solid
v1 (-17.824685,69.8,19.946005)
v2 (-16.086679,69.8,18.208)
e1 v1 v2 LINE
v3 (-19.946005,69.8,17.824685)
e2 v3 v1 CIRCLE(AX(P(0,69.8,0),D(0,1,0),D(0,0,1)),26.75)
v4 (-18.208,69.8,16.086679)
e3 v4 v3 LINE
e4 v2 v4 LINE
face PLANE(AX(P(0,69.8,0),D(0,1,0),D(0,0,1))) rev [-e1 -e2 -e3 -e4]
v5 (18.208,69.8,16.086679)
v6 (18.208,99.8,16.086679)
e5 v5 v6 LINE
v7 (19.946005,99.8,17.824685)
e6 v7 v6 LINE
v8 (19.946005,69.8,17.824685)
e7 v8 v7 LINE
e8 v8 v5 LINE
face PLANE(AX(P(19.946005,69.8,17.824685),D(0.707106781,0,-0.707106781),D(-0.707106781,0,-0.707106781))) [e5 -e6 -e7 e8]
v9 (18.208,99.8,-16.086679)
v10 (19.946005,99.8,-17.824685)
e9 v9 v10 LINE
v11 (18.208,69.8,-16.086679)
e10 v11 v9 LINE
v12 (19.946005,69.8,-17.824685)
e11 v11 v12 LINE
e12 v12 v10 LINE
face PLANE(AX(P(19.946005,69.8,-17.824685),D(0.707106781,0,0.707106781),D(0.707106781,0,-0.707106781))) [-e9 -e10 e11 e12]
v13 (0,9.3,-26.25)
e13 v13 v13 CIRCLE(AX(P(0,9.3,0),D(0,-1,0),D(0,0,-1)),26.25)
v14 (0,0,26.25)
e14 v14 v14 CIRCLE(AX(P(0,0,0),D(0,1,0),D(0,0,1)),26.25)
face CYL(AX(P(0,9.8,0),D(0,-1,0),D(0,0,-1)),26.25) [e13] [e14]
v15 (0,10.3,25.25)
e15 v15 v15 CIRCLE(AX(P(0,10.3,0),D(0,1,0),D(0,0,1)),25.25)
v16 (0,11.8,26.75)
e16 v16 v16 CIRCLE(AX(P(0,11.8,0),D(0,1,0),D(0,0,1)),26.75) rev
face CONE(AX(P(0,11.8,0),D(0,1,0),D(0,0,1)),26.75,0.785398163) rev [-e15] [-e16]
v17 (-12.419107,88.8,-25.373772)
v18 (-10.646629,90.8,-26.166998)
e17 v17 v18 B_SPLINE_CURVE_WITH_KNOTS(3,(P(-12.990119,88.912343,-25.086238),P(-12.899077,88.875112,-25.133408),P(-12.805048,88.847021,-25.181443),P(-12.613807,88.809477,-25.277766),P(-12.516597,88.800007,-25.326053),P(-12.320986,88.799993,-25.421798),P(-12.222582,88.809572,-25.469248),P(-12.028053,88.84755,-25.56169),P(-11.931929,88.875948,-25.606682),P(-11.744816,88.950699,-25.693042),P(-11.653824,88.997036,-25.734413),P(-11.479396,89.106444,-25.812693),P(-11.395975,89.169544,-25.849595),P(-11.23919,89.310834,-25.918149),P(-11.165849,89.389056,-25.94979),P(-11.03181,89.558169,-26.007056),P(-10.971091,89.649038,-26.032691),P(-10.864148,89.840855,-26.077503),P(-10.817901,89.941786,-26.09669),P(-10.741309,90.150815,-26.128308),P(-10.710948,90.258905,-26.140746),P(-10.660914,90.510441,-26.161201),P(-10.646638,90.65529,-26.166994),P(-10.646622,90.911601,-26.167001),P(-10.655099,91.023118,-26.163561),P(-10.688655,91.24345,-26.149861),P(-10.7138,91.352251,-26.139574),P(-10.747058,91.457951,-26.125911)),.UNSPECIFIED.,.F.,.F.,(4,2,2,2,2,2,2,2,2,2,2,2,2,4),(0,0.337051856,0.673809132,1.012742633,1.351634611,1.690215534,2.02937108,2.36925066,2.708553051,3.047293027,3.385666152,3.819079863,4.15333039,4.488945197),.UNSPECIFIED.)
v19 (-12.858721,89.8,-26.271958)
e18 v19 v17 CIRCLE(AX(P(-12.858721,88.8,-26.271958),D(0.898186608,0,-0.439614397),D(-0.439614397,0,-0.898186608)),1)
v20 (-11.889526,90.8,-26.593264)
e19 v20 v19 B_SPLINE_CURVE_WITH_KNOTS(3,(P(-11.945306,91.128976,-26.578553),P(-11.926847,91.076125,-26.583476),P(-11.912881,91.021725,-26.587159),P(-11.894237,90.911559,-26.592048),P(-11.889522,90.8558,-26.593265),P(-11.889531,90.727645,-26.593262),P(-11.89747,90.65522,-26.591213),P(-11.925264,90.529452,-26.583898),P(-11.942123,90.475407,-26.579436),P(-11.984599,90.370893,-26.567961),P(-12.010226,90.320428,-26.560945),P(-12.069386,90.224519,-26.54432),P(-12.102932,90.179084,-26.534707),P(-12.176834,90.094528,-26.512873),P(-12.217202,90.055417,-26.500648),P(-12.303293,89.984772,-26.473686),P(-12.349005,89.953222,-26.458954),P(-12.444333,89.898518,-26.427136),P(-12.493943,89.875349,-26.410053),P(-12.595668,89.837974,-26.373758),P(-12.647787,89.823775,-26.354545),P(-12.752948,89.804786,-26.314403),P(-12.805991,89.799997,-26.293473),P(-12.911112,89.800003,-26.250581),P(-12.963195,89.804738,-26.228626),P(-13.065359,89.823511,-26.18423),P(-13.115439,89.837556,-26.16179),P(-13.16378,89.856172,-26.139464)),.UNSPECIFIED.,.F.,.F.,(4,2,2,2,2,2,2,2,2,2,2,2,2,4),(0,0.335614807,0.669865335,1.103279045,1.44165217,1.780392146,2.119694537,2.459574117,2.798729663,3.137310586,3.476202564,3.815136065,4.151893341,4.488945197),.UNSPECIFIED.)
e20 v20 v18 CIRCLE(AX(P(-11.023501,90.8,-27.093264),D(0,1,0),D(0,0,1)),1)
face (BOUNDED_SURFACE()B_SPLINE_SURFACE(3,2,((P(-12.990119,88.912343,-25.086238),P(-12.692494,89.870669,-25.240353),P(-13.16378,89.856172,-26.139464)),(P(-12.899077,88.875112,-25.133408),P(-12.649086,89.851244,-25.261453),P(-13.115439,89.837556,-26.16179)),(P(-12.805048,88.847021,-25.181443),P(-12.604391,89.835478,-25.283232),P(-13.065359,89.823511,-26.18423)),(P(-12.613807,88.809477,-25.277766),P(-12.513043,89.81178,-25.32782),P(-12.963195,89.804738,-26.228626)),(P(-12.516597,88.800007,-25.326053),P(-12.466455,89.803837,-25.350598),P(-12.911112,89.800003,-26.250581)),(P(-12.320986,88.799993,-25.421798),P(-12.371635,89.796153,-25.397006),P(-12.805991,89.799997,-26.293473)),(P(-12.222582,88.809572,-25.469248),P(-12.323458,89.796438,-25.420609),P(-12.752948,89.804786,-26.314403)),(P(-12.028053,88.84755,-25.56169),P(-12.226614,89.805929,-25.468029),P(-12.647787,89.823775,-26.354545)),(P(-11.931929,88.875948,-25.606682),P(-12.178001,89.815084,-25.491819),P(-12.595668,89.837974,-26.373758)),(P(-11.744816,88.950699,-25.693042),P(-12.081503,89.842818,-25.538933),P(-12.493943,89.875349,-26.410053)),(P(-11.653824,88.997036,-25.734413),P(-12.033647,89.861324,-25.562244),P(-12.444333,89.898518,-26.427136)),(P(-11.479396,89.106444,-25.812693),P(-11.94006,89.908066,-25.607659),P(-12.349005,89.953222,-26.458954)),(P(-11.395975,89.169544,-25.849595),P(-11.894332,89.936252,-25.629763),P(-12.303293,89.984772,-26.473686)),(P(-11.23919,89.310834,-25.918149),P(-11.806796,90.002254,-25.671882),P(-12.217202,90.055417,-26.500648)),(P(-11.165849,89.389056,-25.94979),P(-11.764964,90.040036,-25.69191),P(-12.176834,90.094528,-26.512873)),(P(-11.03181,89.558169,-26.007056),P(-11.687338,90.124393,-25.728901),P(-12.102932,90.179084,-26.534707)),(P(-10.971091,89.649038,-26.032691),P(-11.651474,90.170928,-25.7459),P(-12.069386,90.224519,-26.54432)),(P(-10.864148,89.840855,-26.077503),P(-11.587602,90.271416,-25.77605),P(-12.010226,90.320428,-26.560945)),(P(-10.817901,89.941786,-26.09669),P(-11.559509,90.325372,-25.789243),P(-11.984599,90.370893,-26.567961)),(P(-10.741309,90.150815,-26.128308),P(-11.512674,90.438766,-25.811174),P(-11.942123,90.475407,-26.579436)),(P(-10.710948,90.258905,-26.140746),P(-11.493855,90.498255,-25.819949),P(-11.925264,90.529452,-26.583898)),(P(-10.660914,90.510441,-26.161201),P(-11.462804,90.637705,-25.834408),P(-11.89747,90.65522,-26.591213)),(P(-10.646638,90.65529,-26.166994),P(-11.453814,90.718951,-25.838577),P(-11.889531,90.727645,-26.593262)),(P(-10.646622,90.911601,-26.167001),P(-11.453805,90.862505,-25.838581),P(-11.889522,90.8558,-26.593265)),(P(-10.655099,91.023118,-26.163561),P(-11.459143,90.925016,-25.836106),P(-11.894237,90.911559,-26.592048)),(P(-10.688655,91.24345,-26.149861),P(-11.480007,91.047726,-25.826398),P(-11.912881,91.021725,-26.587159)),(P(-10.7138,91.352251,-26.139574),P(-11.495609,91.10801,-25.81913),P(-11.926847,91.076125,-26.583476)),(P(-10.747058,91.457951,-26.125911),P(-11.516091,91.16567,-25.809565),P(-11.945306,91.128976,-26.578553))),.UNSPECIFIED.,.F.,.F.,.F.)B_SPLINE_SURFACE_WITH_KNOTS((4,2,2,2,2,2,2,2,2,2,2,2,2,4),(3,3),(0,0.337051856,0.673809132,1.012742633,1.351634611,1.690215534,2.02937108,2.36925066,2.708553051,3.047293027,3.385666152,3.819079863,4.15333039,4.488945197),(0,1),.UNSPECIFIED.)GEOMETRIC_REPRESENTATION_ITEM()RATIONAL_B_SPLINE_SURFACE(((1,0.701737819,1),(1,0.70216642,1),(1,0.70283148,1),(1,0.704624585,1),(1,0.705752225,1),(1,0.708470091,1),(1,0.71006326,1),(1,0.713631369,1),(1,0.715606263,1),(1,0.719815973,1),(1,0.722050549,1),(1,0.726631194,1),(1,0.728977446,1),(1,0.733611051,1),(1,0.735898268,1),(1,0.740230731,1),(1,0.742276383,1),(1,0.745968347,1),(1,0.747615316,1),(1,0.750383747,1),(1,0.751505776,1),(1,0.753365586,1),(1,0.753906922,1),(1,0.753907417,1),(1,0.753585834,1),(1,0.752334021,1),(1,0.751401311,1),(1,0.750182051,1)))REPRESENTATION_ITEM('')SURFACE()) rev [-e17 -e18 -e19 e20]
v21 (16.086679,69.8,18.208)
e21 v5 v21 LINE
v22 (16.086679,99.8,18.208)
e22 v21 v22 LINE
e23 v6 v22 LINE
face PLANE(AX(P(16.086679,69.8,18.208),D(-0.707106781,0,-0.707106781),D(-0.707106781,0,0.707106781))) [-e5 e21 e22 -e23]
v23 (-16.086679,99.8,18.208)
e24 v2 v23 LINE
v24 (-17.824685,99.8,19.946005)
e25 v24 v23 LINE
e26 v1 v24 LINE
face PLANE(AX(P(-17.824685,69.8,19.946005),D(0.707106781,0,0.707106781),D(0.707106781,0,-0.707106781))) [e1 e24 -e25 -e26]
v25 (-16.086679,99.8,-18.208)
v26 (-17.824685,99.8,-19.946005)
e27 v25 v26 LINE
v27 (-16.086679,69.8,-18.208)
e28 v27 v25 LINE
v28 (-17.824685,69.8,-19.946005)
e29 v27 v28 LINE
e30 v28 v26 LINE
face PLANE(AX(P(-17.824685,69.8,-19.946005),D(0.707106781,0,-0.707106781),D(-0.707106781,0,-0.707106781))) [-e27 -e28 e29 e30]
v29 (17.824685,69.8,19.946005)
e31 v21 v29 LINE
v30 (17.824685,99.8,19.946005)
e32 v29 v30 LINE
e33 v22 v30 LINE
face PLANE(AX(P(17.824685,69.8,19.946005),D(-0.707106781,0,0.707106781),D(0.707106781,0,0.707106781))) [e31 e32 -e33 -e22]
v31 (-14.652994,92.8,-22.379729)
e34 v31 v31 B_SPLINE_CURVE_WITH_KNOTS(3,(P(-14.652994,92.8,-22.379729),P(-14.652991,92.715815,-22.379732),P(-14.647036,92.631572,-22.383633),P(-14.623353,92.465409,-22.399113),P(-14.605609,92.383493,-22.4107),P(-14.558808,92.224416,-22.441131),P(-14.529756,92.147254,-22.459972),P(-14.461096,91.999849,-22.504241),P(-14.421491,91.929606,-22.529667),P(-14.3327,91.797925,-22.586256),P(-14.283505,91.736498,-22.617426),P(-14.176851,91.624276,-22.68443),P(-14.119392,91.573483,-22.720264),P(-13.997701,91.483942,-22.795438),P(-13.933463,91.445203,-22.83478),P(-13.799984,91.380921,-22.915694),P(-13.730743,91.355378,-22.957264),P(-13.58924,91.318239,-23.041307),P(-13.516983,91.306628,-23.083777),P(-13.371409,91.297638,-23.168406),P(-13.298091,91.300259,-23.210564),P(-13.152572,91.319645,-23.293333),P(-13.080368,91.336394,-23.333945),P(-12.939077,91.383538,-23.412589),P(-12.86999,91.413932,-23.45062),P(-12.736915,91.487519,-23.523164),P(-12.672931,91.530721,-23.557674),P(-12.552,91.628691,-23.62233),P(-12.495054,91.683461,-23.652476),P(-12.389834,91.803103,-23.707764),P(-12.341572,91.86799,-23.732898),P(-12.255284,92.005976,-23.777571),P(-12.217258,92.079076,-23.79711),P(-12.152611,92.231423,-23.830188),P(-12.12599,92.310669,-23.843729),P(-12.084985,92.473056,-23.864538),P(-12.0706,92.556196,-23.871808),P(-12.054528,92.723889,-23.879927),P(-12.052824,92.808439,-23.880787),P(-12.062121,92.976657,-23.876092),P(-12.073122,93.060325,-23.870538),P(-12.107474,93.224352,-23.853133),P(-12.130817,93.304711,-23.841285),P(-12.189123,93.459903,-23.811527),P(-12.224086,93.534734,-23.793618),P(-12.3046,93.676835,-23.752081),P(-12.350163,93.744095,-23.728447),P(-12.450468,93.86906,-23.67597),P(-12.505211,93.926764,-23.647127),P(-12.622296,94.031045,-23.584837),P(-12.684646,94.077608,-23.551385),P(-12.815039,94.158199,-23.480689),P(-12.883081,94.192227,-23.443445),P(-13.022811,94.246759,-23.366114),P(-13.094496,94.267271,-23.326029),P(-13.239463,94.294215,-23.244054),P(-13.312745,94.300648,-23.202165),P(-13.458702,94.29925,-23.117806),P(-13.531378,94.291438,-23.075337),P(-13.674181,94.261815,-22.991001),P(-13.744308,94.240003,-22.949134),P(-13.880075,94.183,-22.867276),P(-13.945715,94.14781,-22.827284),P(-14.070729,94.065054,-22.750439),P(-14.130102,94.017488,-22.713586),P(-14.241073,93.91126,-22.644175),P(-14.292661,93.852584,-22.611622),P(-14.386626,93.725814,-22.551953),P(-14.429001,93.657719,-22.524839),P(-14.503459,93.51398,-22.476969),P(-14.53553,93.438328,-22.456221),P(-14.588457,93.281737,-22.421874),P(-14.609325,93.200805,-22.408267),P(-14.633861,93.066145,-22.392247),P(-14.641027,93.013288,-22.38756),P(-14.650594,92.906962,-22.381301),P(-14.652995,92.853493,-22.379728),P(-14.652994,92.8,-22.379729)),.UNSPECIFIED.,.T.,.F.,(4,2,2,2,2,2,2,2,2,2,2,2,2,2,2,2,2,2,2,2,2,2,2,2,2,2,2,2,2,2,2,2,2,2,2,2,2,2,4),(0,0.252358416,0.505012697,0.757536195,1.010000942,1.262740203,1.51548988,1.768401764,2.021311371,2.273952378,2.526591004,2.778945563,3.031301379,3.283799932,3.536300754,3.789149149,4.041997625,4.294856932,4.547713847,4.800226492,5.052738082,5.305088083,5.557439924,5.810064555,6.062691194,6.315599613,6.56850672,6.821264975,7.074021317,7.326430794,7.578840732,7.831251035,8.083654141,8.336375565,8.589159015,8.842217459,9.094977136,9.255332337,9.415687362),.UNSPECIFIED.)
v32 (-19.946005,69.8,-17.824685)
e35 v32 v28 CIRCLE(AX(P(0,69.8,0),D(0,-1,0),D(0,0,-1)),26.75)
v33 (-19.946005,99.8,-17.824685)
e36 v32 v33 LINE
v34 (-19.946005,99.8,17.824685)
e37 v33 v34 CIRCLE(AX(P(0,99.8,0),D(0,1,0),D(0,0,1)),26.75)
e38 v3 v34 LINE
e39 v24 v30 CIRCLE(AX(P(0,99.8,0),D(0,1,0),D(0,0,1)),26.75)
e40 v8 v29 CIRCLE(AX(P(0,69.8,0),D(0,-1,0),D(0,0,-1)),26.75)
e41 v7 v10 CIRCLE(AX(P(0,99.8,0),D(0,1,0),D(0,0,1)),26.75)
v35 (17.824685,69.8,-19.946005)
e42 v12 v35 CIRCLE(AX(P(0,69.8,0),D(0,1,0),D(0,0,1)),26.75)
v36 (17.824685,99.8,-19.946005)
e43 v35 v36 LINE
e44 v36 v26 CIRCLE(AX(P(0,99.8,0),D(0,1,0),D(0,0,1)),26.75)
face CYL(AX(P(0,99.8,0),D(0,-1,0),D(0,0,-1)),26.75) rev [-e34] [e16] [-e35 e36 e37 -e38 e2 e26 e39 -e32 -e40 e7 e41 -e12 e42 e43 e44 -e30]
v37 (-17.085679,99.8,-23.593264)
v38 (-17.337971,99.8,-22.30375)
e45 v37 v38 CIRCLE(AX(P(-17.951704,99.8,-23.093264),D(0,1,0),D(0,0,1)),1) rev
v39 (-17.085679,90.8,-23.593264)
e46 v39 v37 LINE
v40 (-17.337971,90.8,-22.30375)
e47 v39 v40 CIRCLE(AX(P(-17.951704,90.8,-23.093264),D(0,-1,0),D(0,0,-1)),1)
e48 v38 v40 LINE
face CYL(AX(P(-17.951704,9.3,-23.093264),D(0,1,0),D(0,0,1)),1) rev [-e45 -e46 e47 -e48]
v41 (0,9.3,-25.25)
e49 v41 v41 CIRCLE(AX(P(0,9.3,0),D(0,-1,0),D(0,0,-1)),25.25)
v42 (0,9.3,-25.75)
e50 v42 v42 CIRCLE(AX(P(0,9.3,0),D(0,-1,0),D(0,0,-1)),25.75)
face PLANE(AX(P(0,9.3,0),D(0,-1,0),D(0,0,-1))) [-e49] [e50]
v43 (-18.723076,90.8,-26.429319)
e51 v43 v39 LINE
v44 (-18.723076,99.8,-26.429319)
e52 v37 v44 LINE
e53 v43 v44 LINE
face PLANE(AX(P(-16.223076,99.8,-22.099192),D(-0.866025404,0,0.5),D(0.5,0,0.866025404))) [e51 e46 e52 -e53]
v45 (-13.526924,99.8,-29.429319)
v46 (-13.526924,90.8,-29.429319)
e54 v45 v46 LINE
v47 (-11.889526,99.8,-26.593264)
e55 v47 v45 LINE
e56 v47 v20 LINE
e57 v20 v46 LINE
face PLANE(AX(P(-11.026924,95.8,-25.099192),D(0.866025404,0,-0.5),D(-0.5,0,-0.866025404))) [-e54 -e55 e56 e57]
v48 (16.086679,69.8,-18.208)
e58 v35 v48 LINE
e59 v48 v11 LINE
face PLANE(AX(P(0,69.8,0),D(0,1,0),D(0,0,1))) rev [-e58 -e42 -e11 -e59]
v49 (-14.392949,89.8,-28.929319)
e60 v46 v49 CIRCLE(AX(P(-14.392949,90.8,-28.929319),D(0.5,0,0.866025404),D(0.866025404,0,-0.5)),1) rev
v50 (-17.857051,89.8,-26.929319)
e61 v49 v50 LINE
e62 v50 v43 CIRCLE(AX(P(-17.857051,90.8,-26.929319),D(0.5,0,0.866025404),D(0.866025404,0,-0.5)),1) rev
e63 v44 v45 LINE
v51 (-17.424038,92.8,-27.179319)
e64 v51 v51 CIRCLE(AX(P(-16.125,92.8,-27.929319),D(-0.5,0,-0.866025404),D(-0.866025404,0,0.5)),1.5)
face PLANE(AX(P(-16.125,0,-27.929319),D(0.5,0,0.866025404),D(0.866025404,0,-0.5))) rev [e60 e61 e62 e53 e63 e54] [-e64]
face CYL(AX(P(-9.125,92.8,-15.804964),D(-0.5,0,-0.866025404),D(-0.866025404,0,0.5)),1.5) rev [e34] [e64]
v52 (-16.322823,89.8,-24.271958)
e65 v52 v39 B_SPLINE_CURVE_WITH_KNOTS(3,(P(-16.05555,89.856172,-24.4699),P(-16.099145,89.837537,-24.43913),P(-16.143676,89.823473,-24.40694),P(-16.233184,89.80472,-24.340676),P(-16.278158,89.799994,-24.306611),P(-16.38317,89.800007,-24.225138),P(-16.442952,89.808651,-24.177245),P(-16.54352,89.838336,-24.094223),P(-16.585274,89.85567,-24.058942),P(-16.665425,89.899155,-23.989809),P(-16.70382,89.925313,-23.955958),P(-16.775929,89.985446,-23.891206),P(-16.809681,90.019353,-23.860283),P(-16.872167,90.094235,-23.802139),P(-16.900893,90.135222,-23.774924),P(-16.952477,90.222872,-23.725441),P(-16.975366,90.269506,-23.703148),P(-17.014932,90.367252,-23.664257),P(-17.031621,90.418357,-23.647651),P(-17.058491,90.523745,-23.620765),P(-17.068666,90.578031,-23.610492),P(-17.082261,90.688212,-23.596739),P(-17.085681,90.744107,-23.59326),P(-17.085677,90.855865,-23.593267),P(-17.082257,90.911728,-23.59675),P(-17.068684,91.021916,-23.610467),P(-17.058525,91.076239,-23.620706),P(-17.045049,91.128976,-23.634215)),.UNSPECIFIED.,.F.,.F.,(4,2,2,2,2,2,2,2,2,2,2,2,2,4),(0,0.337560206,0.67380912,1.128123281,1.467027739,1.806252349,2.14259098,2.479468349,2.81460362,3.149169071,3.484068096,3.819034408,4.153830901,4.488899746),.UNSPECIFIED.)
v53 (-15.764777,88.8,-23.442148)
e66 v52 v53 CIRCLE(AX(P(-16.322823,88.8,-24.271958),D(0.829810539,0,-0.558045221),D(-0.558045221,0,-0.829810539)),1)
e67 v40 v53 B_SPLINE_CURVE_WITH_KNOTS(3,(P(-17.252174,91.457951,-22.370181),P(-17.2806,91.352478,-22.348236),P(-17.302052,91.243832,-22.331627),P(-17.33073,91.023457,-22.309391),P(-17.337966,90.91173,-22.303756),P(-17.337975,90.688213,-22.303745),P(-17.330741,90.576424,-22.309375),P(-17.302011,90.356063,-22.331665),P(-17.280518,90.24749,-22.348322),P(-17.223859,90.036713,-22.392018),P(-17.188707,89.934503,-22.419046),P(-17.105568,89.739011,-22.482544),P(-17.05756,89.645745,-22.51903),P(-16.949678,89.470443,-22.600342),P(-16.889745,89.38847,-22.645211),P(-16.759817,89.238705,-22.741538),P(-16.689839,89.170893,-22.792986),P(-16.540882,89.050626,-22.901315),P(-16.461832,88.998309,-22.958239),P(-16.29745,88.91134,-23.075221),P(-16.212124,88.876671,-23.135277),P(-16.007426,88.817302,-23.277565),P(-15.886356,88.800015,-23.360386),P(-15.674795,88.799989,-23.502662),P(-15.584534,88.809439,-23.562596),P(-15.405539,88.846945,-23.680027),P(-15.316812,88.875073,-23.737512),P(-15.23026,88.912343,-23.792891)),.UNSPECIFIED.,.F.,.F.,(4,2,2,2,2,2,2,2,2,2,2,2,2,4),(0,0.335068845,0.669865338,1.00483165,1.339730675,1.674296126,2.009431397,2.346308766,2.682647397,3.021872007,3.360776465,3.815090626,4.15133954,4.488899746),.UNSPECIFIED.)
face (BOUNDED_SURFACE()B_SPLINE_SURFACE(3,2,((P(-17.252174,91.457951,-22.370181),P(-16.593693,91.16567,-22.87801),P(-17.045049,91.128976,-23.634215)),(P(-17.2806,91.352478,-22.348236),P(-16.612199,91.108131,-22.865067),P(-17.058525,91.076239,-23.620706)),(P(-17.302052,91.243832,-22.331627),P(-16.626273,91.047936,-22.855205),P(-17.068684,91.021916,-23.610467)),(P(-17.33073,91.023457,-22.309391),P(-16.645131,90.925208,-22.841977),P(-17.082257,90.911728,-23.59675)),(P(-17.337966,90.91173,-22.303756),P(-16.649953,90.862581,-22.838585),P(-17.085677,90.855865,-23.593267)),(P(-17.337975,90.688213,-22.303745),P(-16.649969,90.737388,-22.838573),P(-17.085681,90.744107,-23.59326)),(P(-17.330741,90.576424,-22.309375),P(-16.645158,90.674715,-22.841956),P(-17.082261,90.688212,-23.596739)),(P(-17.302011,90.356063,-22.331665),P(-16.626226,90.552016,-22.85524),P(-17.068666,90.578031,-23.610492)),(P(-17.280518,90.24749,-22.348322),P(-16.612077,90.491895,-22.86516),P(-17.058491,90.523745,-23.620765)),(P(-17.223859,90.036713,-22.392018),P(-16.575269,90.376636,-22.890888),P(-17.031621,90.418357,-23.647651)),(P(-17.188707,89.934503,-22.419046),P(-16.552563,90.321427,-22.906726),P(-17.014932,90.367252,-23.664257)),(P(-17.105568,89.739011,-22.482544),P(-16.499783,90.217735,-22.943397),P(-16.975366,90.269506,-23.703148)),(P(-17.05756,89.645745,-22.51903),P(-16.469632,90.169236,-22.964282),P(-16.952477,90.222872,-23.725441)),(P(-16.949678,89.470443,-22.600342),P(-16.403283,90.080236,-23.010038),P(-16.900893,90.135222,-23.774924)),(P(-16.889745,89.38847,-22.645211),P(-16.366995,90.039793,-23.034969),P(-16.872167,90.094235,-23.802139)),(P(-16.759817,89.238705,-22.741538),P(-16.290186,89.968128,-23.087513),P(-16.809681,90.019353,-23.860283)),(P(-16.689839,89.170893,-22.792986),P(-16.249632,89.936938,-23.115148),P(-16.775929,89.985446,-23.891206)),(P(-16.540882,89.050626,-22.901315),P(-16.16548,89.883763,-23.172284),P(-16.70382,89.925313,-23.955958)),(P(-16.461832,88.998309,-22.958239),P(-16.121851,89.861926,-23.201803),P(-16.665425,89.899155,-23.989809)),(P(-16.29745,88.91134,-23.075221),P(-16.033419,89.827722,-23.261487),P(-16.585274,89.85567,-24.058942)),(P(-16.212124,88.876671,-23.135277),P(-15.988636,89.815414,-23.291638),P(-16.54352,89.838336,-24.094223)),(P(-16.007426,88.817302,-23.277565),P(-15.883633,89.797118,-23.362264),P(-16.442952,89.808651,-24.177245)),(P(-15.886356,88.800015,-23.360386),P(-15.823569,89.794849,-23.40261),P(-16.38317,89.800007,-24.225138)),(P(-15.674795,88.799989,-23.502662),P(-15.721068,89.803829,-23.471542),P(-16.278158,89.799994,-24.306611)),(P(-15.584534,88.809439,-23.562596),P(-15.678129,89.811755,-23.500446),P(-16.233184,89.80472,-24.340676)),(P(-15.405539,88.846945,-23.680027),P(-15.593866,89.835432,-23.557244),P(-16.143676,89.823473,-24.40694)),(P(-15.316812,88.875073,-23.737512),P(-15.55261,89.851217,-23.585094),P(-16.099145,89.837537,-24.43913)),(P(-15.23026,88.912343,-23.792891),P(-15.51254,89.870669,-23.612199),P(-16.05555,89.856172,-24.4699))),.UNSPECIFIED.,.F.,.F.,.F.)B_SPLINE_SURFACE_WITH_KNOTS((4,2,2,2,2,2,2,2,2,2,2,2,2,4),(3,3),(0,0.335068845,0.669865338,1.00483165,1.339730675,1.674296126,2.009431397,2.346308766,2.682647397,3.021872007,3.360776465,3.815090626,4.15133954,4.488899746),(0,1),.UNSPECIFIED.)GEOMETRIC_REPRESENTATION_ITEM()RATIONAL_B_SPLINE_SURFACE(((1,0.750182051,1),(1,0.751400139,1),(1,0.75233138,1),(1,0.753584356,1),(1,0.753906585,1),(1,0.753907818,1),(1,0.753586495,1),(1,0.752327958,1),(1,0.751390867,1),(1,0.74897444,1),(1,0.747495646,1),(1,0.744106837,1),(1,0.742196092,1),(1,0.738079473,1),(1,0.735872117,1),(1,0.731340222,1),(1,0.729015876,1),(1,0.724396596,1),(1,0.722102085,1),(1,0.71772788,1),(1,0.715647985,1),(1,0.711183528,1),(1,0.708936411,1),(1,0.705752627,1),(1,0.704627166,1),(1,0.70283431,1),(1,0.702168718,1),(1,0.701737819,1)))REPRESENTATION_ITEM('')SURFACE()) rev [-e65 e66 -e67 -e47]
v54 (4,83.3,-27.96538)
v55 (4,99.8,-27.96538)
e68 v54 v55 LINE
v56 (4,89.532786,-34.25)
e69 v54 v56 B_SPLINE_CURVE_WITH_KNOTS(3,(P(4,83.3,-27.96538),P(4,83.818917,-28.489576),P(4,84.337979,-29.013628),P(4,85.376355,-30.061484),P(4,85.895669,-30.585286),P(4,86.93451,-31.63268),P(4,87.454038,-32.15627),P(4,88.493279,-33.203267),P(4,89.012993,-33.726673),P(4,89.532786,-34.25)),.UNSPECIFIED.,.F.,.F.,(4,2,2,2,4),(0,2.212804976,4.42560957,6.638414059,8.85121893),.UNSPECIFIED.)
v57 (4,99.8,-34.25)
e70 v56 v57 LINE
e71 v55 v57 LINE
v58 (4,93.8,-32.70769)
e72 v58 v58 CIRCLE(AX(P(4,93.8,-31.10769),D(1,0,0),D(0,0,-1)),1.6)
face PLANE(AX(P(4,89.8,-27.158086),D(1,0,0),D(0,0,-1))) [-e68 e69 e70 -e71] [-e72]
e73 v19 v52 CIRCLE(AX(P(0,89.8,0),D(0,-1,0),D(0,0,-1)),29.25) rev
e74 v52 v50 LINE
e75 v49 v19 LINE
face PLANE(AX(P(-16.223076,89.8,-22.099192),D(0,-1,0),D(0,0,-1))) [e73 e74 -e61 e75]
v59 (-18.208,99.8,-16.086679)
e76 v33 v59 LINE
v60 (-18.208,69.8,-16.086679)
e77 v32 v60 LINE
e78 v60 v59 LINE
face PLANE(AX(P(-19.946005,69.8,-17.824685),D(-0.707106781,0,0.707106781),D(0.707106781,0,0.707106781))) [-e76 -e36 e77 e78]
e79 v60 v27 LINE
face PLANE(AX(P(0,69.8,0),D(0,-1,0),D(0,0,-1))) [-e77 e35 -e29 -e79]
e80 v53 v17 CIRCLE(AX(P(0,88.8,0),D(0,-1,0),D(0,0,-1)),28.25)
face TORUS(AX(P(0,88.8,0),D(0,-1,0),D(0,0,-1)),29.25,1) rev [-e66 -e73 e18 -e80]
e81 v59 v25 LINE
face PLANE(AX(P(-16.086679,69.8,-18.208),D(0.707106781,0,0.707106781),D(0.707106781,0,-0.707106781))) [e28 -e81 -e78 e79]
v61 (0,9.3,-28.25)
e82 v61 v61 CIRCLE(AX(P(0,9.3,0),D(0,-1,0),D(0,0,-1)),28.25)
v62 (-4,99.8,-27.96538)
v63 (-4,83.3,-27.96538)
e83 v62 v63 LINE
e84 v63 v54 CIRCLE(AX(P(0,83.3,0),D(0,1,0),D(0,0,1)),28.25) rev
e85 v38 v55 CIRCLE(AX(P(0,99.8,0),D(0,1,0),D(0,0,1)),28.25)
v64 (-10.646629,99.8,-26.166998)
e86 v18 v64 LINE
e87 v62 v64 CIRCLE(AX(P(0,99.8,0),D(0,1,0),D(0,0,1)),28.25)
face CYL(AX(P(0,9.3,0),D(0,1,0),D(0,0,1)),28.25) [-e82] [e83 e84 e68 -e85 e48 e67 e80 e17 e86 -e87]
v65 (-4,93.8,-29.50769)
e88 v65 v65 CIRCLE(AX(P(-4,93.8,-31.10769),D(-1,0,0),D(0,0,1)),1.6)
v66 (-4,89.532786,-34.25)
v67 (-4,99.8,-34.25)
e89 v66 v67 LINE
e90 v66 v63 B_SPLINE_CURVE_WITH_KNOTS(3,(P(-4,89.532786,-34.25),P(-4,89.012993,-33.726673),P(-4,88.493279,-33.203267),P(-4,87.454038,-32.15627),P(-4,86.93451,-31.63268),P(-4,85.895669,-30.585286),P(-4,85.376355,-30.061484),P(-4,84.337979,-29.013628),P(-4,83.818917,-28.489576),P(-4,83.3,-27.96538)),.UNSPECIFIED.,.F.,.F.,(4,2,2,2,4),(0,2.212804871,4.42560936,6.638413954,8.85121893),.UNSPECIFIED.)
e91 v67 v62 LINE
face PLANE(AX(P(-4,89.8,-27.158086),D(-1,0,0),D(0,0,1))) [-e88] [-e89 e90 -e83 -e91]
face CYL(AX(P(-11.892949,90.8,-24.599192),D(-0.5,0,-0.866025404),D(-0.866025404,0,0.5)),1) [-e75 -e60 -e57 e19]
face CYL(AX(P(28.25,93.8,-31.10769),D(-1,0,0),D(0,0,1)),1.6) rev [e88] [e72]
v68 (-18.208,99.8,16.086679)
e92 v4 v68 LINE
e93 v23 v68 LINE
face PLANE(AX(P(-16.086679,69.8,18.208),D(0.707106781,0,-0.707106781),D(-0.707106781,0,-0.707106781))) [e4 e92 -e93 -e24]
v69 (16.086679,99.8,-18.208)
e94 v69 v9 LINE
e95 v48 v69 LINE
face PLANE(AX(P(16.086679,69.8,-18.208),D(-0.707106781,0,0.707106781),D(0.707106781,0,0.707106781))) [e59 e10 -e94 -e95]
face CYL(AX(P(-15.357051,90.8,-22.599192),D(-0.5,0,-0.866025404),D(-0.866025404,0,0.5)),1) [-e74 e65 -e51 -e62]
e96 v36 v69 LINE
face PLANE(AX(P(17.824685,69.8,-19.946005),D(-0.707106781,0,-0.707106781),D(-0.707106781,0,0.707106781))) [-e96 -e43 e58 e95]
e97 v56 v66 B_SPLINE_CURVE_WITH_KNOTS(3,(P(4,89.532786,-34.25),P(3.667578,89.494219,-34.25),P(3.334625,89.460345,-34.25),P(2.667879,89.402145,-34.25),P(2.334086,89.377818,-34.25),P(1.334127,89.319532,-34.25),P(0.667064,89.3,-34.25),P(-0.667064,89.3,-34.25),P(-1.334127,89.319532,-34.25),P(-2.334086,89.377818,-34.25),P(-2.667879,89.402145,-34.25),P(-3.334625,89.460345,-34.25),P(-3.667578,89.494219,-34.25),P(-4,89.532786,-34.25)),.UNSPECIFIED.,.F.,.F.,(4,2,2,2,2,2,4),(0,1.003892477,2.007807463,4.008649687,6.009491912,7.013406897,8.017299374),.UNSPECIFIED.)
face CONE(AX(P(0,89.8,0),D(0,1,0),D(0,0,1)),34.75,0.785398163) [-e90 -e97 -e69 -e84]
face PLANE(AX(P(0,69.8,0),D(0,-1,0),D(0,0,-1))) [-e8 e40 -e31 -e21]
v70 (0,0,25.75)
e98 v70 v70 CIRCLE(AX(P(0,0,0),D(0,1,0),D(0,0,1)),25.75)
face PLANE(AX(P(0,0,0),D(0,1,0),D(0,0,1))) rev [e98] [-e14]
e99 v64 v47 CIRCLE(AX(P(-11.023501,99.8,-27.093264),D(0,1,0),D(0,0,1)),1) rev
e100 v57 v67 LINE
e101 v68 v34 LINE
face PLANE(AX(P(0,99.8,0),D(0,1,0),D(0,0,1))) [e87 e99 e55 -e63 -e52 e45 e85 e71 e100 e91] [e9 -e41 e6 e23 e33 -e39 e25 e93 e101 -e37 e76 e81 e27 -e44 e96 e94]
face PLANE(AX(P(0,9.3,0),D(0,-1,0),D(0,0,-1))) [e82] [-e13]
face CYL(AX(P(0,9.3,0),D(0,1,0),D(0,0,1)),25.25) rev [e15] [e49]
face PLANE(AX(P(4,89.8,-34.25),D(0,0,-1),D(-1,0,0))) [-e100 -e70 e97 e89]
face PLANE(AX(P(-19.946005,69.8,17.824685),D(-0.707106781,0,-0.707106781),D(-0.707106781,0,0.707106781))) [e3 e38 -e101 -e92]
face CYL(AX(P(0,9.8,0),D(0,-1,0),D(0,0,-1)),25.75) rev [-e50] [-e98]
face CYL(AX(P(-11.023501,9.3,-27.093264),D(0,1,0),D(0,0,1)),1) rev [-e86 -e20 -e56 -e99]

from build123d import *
from build123d.topology import SkipClean

# Parameters (mm, degrees)
SKIZZE1_R                            = 26.25
SKIZZE1_R_2                          = 25.75
AUFSATZ_LINEAR_AUSTRAGEN1_DEPTH      = 9.8
SKIZZE2_R                            = 28.25
SKIZZE2_R_2                          = 26.75
AUFSATZ_LINEAR_AUSTRAGEN2_DEPTH      = 90
SKIZZE4_W                            = 8
SKIZZE4_H                            = 7.091913552
AUFSATZ_LINEAR_AUSTRAGEN4_DEPTH      = 10
SKIZZE5_R                            = 28.25
SKIZZE5_R_2                          = 25.25
AUFSATZ_LINEAR_AUSTRAGEN5_DEPTH      = 0.5
SKIZZE6_R                            = 1.6
SCHNITT_LINEAR_AUSTRAGEN1_DEPTH      = 111.332066962
AUFSATZ_LINEAR_AUSTRAGEN6_DEPTH      = 30
FASE1_SIZE                           = 2
FASE2_SIZE                           = 6.5
SKIZZE9_R                            = 1.5
SCHNITT_LINEAR_AUSTRAGEN3_DEPTH      = 10
AUFSATZ_LINEAR_AUSTRAGEN7_DEPTH      = 4
AUFSATZ_LINEAR_AUSTRAGEN7_DEPTH_BACK = 1
SKIZZE12_R                           = 1.5
SCHNITT_LINEAR_AUSTRAGEN4_DEPTH      = 10
VERRUNDUNG1_R                        = 1
VERRUNDUNG2_R                        = 1


with BuildPart() as part:
    # Skizze1 → Aufsatz-Linear austragen1 (new body)
    with BuildSketch(Plane(origin=(0, 0, 0), x_dir=(1, 0, 0), z_dir=(0, 1, 0))):
        with Locations(Location((0, 0, 0), (0, 0, 270))):
            Circle(SKIZZE1_R)
        with Locations(Location((0, 0, 0), (0, 0, 270))):
            Circle(SKIZZE1_R_2, mode=Mode.SUBTRACT)
    extrude(amount=AUFSATZ_LINEAR_AUSTRAGEN1_DEPTH)



with BuildPart() as body_2:
    # Skizze2 → Aufsatz-Linear austragen2 (new body)
    with BuildSketch(Plane(origin=(0, 9.8, 0), x_dir=(1, 0, 0), z_dir=(0, 1, 0))):
        with Locations(Location((0, 0, 0), (0, 0, 90))):
            Circle(SKIZZE2_R)
        with Locations(Location((0, 0, 0), (0, 0, 90))):
            Circle(SKIZZE2_R_2, mode=Mode.SUBTRACT)
    extrude(amount=AUFSATZ_LINEAR_AUSTRAGEN2_DEPTH)

    # Skizze4 → Aufsatz-Linear austragen4 (add)
    with BuildSketch(Plane(origin=(0, 99.8, 0), x_dir=(1, 0, 0), z_dir=(0, 1, 0))):
        with Locations((0, 30.704043224)):
            Rectangle(SKIZZE4_W, SKIZZE4_H)
    extrude(amount=-AUFSATZ_LINEAR_AUSTRAGEN4_DEPTH)


with BuildPart() as part_1:
    with SkipClean():  # the faces are left unmerged after this step: merging them gives an invalid solid
        add(part.part)

        add(body_2.part)  # Aufsatz-Linear austragen5 merges body 2
        # Skizze5 → Aufsatz-Linear austragen5 (add)
        with BuildSketch(Plane.XZ.offset(-9.8)):
            with Locations(Location((0, 0, 0), (0, 0, 278.140032175))):
                Circle(SKIZZE5_R)
            with Locations(Location((0, 0, 0), (0, 0, 270))):
                Circle(SKIZZE5_R_2, mode=Mode.SUBTRACT)
        extrude(amount=AUFSATZ_LINEAR_AUSTRAGEN5_DEPTH)

    # Skizze6 → Schnitt-Linear austragen1 (cut, through all)
    with SkipClean():  # the faces are left unmerged after this step: merging them gives an invalid solid
        with BuildSketch(Plane.ZY.offset(4)):
            with Locations((-31.107690192, 93.8)):
                Circle(SKIZZE6_R)
        extrude(amount=-SCHNITT_LINEAR_AUSTRAGEN1_DEPTH, mode=Mode.SUBTRACT)

    # Skizze7 → Aufsatz-Linear austragen6 (add)
    with SkipClean():  # the faces are left unmerged after this step: merging them gives an invalid solid
        with BuildSketch(Plane(origin=(0, 99.8, 0), x_dir=(1, 0, 0), z_dir=(0, 1, 0))):
            Polygon((-17.824684675, 19.946005019), (-16.086679272, 18.207999616), (-18.207999616, 16.086679272), (-19.946005019, 17.824684675), (-19.438254624, 19.438254624), align=None)
            Polygon((19.438254624, 19.438254624), (17.824684675, 19.946005019), (16.086679272, 18.207999616), (18.207999616, 16.086679272), (19.946005019, 17.824684675), align=None)
            Polygon((17.824684675, -19.946005019), (16.086679272, -18.207999616), (18.207999616, -16.086679272), (19.946005019, -17.824684675), (19.438254624, -19.438254624), align=None)
            Polygon((-19.438254624, -19.438254624), (-17.824684675, -19.946005019), (-16.086679272, -18.207999616), (-18.207999616, -16.086679272), (-19.946005019, -17.824684675), align=None)
        extrude(amount=-AUFSATZ_LINEAR_AUSTRAGEN6_DEPTH)

    # Fase1
    # the kernel refuses this chamfer: 2 mm, written as the material it adds along each edge
    with BuildSketch(Plane(origin=(0, 9.8, 0), x_dir=(0, 0, -1), z_dir=(1, 0, 0))) as fase1_piece_1_section:
        Polygon((26.75, FASE1_SIZE), (26.75 - FASE1_SIZE, 0), (26.75, 0), align=None)
    fase1_piece_1 = revolve(axis=Axis((0, 9.8, 0), (0, 1, 0)), mode=Mode.PRIVATE)
    fase1_piece_1 = fase1_piece_1 - Plane(origin=(0, 11.029190239, 0), x_dir=(0, 0, -1), z_dir=(0, 1, 0)) * Cylinder(25.25, 107, mode=Mode.PRIVATE)
    add(fase1_piece_1)

    # Fase2
    # the kernel refuses this chamfer: 6.5 mm, written as the material it adds along each edge
    with BuildSketch(Plane(origin=(0, 89.8, 0), x_dir=(-0.6696868042546434, 0, -0.7426436455038196), z_dir=(-0.7426436455038196, 0, 0.6696868042546434))) as fase2_piece_1_section:
        Polygon((28.25, FASE2_SIZE), (28.25 + FASE2_SIZE, 0), (28.25, 0), align=None)
    fase2_piece_1 = revolve(axis=Axis((0, 89.8, 0), (0, -1, 0)), revolution_arc=42.042896807, mode=Mode.PRIVATE)
    fase2_piece_1 = split(fase2_piece_1, bisect_by=Plane(origin=(-4, 87.632301808, -30.259261886), z_dir=(1, 0, 0)), keep=Keep.TOP, mode=Mode.PRIVATE)
    fase2_piece_1 = split(fase2_piece_1, bisect_by=Plane(origin=(-2.005219876, 87.632301808, -34.25), z_dir=(0, 0, 1)), keep=Keep.TOP, mode=Mode.PRIVATE)
    with BuildSketch(Plane(origin=(0, 89.8, 0), x_dir=(0, 0, -1), z_dir=(-1, 0, 0))) as fase2_piece_2_section:
        Polygon((28.25, FASE2_SIZE), (28.25 + FASE2_SIZE, 0), (28.25, 0), align=None)
    fase2_piece_2 = revolve(axis=Axis((0, 89.8, 0), (0, -1, 0)), revolution_arc=42.042896807, mode=Mode.PRIVATE)
    fase2_piece_2 = split(fase2_piece_2, bisect_by=Plane(origin=(4, 87.632301812, -30.25926189), z_dir=(-1, 0, 0)), keep=Keep.TOP, mode=Mode.PRIVATE)
    fase2_piece_2 = split(fase2_piece_2, bisect_by=Plane(origin=(2.005219877, 87.632301812, -34.25), z_dir=(0, 0, 1)), keep=Keep.TOP, mode=Mode.PRIVATE)
    add([fase2_piece_1, fase2_piece_2])

    # Skizze9 → Schnitt-Linear austragen3 (cut)
    with BuildSketch(Plane(origin=(-14.125, 0, -24.465217657), x_dir=(0, 1, 0), z_dir=(-0.500000000000001, 0, -0.866025403784438))):
        with Locations(Location((92.8, 0, 0), (0, 0, 270))):
            Circle(SKIZZE9_R)
    extrude(amount=-SCHNITT_LINEAR_AUSTRAGEN3_DEPTH, mode=Mode.SUBTRACT)

    # Skizze11 → Aufsatz-Linear austragen7 (add, two sides: drawn at the far end of the back side and taken through both)
    with BuildSketch(Plane(origin=(-14.125, 0, -24.465217657), x_dir=(0, 1, 0), z_dir=(-0.500000000000001, 0, -0.866025403784438)).offset(-AUFSATZ_LINEAR_AUSTRAGEN7_DEPTH_BACK)):
        Polygon((95.8, 3), (99.8, 3), (99.8, -3), (95.8, -3), (89.8, -3), (89.8, 3), align=None)
    extrude(amount=AUFSATZ_LINEAR_AUSTRAGEN7_DEPTH + AUFSATZ_LINEAR_AUSTRAGEN7_DEPTH_BACK)

    # Skizze12 → Schnitt-Linear austragen4 (cut)
    with BuildSketch(Plane(origin=(-16.125, 0, -27.929319272), x_dir=(-0.866025403784438, 0, 0.5000000000000012), z_dir=(-0.5000000000000011, 0, -0.8660254037844379))):
        with Locations((0, 92.8)):
            Circle(SKIZZE12_R)
    extrude(amount=-SCHNITT_LINEAR_AUSTRAGEN4_DEPTH, mode=Mode.SUBTRACT)

    # Verrundung1
    verrundung1_edges = [part_1.edges().sort_by_distance(p)[0] for p in [
        (-12.486987868, 89.8, -27.628097421),
        (-17.683140291, 89.8, -24.628097421),
    ]]
    fillet(verrundung1_edges, radius=VERRUNDUNG1_R)

    # Verrundung2
    verrundung2_edges = [part_1.edges().sort_by_distance(p)[0] for p in [
        (-16.64320437, 95.3, -22.82687557),
        (-11.447051948, 95.3, -25.82687557),
        (-14.125, 89.8, -24.465217657),
        (-11.716058882, 90.092363035, -25.705961648),
        (-16.403986386, 90.09236302, -22.999385442),
    ]]
    fillet(verrundung2_edges, radius=VERRUNDUNG2_R)


solid = part_1.part
